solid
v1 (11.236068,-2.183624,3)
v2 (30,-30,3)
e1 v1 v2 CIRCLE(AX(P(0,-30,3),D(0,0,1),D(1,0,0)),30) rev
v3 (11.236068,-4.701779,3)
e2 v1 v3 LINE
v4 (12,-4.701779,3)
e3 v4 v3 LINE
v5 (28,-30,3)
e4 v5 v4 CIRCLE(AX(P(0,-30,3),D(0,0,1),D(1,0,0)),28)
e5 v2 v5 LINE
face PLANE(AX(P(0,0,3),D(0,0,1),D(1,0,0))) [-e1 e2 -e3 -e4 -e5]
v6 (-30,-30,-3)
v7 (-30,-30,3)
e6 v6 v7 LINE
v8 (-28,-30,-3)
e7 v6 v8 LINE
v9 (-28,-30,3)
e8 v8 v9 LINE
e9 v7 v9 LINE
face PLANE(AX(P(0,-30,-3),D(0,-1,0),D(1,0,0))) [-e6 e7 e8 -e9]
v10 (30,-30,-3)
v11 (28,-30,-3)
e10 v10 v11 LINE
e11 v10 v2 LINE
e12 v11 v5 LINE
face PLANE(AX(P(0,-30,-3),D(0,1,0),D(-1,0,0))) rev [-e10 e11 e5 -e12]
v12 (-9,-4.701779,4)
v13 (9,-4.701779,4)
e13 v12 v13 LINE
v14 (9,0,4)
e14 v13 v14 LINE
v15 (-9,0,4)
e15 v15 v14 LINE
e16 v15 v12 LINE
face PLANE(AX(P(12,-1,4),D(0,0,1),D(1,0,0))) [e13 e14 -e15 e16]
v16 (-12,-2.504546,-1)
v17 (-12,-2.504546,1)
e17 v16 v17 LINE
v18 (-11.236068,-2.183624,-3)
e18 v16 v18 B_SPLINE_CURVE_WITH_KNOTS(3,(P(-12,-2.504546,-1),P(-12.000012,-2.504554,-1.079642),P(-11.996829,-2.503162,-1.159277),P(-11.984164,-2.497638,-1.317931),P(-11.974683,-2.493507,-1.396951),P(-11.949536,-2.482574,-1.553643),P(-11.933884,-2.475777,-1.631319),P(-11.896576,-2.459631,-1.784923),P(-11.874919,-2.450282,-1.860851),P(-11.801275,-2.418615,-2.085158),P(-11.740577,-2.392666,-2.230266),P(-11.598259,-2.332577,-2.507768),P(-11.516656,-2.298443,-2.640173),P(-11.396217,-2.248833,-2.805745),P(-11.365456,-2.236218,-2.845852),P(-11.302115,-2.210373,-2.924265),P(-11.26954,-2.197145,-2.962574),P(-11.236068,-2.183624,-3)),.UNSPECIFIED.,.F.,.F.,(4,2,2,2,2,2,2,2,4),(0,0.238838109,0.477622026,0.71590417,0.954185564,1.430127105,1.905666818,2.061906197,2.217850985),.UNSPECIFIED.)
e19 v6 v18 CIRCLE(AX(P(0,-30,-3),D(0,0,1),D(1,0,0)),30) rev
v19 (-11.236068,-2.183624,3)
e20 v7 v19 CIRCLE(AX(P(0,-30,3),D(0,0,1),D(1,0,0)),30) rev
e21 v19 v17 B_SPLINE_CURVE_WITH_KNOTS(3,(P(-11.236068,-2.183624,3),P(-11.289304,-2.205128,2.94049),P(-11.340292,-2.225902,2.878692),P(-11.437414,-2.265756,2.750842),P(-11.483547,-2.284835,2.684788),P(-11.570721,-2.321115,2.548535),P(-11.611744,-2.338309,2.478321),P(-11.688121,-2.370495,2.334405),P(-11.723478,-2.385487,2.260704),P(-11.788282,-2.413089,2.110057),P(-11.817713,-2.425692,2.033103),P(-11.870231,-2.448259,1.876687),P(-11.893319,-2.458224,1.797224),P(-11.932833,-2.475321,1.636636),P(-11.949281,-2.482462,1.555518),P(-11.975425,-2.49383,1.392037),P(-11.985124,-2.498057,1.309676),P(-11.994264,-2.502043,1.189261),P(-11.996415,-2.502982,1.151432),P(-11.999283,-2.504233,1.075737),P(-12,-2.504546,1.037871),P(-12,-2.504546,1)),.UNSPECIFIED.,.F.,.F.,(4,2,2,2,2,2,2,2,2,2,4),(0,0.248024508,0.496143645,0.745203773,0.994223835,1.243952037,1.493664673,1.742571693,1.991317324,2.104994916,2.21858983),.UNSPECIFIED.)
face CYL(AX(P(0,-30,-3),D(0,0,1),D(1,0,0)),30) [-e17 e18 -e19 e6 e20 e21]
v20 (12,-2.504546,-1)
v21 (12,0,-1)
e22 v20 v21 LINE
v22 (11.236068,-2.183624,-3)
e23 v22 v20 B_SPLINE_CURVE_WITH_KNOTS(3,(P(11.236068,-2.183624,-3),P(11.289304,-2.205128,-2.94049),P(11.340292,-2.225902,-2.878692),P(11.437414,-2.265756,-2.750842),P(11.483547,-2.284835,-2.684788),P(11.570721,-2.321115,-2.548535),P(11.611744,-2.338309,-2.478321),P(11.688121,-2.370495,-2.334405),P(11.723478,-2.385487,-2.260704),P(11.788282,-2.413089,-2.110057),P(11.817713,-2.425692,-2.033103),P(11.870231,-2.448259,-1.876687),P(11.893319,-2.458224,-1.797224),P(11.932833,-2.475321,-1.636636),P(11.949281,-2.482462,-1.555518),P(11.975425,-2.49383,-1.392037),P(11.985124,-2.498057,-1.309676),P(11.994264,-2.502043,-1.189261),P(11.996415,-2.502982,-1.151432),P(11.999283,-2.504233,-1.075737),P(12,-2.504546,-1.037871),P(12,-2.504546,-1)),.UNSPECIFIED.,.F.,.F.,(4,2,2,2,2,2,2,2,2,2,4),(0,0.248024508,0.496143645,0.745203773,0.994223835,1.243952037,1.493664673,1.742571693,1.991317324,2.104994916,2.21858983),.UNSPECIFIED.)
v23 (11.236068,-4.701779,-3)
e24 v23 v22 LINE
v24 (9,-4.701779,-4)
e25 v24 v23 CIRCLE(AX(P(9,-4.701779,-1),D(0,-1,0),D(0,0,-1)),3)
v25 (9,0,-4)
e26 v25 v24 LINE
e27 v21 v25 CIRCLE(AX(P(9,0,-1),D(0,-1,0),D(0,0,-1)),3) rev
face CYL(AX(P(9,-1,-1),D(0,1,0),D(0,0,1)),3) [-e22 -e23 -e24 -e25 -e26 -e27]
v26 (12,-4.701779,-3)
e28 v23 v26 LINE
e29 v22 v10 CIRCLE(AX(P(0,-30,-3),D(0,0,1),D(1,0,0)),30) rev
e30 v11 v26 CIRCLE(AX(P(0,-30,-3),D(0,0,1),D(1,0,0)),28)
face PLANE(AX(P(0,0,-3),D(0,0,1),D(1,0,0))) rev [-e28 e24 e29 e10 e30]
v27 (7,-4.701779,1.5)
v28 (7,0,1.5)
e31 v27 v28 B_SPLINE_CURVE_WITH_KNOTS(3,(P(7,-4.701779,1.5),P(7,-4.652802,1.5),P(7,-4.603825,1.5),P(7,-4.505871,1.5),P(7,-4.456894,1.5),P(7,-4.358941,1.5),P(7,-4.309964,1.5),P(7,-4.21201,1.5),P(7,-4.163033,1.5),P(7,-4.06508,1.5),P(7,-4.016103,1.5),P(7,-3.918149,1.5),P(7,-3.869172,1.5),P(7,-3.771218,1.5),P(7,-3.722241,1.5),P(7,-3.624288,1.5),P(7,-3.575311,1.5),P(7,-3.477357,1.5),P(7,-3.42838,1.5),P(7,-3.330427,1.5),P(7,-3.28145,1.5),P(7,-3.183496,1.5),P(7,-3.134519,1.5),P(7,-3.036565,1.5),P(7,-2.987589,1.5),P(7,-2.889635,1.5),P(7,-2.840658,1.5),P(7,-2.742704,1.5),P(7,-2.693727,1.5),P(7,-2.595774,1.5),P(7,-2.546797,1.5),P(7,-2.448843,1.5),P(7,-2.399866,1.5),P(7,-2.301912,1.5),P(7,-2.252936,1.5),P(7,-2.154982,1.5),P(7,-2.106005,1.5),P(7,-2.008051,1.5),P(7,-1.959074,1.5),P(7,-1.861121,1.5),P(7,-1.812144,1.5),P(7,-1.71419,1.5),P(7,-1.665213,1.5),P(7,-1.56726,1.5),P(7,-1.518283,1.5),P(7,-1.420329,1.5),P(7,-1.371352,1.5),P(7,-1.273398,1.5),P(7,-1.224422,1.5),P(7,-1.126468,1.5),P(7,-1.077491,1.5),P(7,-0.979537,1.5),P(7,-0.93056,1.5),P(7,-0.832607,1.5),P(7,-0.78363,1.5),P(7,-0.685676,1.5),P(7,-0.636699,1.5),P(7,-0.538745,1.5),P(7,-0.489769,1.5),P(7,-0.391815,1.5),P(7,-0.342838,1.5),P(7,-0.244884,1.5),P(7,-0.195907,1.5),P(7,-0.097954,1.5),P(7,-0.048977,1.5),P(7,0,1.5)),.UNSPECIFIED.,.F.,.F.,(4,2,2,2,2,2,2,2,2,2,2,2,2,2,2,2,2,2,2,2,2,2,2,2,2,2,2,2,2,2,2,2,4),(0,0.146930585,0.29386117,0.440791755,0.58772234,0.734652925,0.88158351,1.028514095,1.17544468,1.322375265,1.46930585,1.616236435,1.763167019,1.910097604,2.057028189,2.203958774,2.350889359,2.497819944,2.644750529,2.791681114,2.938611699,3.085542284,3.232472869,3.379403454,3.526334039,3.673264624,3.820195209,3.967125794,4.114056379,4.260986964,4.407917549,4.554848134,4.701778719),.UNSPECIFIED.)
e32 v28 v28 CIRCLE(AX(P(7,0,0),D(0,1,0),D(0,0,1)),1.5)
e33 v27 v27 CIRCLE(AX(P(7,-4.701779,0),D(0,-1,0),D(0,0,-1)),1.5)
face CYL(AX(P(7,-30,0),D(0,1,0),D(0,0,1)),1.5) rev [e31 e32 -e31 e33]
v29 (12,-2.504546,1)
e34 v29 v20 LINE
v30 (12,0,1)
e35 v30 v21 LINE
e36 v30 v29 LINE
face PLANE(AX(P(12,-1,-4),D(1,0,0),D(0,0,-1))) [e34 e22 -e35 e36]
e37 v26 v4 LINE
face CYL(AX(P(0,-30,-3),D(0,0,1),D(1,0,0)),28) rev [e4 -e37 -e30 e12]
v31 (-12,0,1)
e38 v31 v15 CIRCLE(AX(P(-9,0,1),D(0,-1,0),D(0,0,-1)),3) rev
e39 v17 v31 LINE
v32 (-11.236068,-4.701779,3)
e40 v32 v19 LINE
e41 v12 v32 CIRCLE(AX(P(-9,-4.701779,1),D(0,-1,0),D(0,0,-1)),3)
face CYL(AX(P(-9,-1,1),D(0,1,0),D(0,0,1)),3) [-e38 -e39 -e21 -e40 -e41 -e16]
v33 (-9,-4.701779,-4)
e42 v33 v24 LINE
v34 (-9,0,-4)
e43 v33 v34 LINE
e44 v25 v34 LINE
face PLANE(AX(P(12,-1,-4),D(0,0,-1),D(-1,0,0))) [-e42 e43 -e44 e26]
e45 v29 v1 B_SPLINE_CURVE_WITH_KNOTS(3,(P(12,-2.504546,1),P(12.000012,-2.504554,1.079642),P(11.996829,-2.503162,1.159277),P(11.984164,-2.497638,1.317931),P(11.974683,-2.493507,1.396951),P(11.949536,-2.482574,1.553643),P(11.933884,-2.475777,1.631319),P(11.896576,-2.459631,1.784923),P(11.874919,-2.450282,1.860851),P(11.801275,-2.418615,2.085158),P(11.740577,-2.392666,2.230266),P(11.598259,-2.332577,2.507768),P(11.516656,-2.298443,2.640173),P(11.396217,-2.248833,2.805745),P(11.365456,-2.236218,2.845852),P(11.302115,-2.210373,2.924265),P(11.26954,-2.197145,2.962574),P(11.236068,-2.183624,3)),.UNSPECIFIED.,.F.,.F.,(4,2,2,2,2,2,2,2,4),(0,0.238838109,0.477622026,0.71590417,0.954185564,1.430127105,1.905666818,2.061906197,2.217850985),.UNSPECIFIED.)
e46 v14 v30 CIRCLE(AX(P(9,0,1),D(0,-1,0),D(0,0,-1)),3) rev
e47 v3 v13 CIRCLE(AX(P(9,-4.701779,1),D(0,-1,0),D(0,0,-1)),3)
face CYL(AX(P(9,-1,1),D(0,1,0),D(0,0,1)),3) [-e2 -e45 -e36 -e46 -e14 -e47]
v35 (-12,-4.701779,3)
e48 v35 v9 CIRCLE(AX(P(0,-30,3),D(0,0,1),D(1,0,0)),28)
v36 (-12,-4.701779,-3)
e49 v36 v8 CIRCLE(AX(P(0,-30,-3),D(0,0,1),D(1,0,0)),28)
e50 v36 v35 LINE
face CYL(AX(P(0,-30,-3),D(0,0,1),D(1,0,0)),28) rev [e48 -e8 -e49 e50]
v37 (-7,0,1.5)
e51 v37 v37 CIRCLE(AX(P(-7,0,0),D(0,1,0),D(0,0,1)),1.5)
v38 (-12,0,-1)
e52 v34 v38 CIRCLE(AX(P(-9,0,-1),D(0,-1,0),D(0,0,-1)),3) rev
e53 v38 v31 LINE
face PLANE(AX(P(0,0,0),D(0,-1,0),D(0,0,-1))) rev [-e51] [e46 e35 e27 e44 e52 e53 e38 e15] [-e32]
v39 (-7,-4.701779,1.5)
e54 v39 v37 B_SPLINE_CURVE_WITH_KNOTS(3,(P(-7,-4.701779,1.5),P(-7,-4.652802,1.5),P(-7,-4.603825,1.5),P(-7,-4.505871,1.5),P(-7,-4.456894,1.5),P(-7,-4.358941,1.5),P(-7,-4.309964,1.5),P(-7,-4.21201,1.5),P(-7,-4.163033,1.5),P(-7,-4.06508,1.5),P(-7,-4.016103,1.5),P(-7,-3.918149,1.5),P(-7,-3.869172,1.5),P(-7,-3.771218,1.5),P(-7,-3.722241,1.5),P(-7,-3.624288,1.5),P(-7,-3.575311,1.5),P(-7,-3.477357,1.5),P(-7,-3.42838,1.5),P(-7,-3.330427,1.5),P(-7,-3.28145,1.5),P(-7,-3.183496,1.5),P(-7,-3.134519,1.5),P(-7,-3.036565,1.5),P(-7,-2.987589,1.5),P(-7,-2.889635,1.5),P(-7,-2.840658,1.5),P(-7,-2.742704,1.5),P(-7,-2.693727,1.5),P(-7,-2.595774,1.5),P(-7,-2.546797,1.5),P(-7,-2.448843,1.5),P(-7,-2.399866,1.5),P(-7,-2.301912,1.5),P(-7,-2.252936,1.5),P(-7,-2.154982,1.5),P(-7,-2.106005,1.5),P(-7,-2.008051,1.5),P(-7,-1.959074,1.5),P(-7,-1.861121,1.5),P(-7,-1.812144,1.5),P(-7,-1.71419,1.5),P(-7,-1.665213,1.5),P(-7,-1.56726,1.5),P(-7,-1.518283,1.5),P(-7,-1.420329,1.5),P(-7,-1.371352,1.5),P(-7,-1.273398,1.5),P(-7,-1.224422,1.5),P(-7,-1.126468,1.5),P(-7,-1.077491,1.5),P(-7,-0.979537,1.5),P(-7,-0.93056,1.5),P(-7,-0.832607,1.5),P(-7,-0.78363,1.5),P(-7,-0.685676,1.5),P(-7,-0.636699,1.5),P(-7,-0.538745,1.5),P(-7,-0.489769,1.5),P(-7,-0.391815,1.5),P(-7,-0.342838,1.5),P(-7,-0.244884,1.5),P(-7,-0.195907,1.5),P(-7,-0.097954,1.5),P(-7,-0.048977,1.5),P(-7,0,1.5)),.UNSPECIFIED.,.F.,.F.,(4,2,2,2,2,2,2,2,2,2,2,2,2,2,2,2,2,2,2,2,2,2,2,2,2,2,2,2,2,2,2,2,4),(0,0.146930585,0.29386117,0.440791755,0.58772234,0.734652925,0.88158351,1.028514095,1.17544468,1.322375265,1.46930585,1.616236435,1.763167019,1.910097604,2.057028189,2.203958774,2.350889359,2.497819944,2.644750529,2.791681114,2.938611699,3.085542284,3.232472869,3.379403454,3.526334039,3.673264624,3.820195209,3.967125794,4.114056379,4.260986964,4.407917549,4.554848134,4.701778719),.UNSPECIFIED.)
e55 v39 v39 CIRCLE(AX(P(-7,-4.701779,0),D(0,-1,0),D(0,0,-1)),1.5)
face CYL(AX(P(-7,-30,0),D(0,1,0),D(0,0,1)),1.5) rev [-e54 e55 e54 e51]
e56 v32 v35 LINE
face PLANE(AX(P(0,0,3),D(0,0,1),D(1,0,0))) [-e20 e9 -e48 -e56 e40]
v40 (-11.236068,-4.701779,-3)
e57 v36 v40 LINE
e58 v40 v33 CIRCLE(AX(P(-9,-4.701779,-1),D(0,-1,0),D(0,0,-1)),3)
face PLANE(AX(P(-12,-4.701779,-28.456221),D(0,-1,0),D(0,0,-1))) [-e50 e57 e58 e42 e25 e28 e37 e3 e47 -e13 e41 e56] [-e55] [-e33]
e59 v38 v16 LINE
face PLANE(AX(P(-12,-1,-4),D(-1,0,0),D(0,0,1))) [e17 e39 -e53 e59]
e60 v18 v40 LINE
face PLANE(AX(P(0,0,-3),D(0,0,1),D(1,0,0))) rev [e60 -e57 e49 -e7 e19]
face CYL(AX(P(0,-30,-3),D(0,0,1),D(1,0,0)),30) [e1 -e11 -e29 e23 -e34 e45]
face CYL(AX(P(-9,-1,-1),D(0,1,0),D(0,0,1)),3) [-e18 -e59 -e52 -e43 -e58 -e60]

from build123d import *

# Parameters (mm, degrees)
SKETCH_2_W           = 24
SKETCH_2_H           = 8
EXTRUDE_1_DEPTH      = 1
EXTRUDE_3_DEPTH      = 3
EXTRUDE_3_DEPTH_BACK = 3
EXTRUDE_5_REACH      = 45.174
SKETCH_7_W           = 24
SKETCH_7_H           = 4.701778719
SKETCH_3_R           = 1.5
CUT_EXTRUDE_1_DEPTH  = 43.614551505
FILLET_1_R           = 3


with BuildPart() as part:
    # 草图2 → 凸台-拉伸1 (new body)
    with BuildSketch(Plane(origin=(0, 0, 0), x_dir=(1, 0, 0), z_dir=(0, 1, 0))):
        Rectangle(SKETCH_2_W, SKETCH_2_H)
    extrude(amount=-EXTRUDE_1_DEPTH)

    # 凸台-拉伸5: up to this face of the body (flat: up to its plane)
    extrude_5_end = Plane(part.part.faces().sort_by_distance((0, -0.5, -4))[0])
    # 草图7 → 凸台-拉伸5 (add, up to the picked face)
    with BuildSketch(Plane.XY.offset(4), mode=Mode.PRIVATE) as extrude_5_sk1:
        with Locations((0, -2.350889359)):
            Rectangle(SKETCH_7_W, SKETCH_7_H)
    extrude_5_tool1 = split(extrude(extrude_5_sk1.sketch, amount=-EXTRUDE_5_REACH, mode=Mode.PRIVATE), bisect_by=extrude_5_end, keep=Keep.BOTH, mode=Mode.PRIVATE)


with BuildPart() as body_2:
    # 草图5 → 凸台-拉伸3 (new, two sides: drawn at the far end of the back side and taken through both)
    with BuildSketch(Plane.XY.offset(-EXTRUDE_3_DEPTH_BACK)):
        with BuildLine():
            ThreePointArc((30, -30), (21.213203436, -8.786796564), (0, 0))
            Line((0, 0), (0, -2))
            ThreePointArc((0, -2), (19.798989873, -10.201010127), (28, -30))
            Line((28, -30), (30, -30))
        make_face()
        with BuildLine():
            Line((0, -2), (0, 0))
            ThreePointArc((0, 0), (-21.213203436, -8.786796564), (-30, -30))
            Line((-30, -30), (-28, -30))
            ThreePointArc((-28, -30), (-19.798989873, -10.201010127), (0, -2))
        make_face()
    extrude(amount=EXTRUDE_3_DEPTH + EXTRUDE_3_DEPTH_BACK)


with BuildPart() as part_1:
    add(part.part)

    add(body_2.part)  # 凸台-拉伸5 merges body 2
    add(extrude_5_tool1.solids().sort_by(Axis((0, -2.350889, 4), (0, 0, -1)))[0])

    # 草图3 → 切除-拉伸1 (cut, through all)
    with BuildSketch(Plane(origin=(0, 0, 0), x_dir=(1, 0, 0), z_dir=(0, 1, 0))):
        with Locations(Location((-7, 0, 0), (0, 0, 270))):
            Circle(SKETCH_3_R)
        with Locations(Location((7, 0, 0), (0, 0, 270))):
            Circle(SKETCH_3_R)
    extrude(amount=-CUT_EXTRUDE_1_DEPTH, mode=Mode.SUBTRACT)

    # 圆角1
    # the kernel refuses this fillet: 3 mm, written as the material it takes off along each edge
    with BuildSketch(Plane(origin=(-12, -12.201778719, 4), x_dir=(0, 0, -1), z_dir=(0, 1, 0))) as fillet_1_piece_1_section:
        with BuildLine():
            CenterArc((FILLET_1_R, -FILLET_1_R), FILLET_1_R, 90, 90)
            Line((0, -FILLET_1_R), (0, 0))
            Line((0, 0), (FILLET_1_R, 0))
        make_face()
    fillet_1_piece_1 = extrude(amount=19.701778719, mode=Mode.PRIVATE)
    fillet_1_piece_1 = split(fillet_1_piece_1, bisect_by=Plane(origin=(-10.804220272, -4.438855897, 3), z_dir=(0, 0, 1)), keep=Keep.TOP, mode=Mode.PRIVATE)
    add(fillet_1_piece_1, mode=Mode.SUBTRACT)
    with BuildSketch(Plane(origin=(-12, -12.201778719, 4), x_dir=(0, 0, -1), z_dir=(0, 1, 0))) as fillet_1_piece_2_section:
        with BuildLine():
            CenterArc((FILLET_1_R, -FILLET_1_R), FILLET_1_R, 90, 90)
            Line((0, -FILLET_1_R), (0, 0))
            Line((0, 0), (FILLET_1_R, 0))
        make_face()
    fillet_1_piece_2 = extrude(amount=19.701778719, mode=Mode.PRIVATE)
    fillet_1_piece_2 = fillet_1_piece_2 - Plane(origin=(0, -30, 2.5069518), x_dir=(1, 0, 0), z_dir=(0, 0, -1)) * Cylinder(30, 52, mode=Mode.PRIVATE)
    add(fillet_1_piece_2, mode=Mode.SUBTRACT)
    with BuildSketch(Plane(origin=(-12, -12.201778719, -4), x_dir=(1, 0, 0), z_dir=(0, 1, 0))) as fillet_1_piece_3_section:
        with BuildLine():
            CenterArc((FILLET_1_R, -FILLET_1_R), FILLET_1_R, 90, 90)
            Line((0, -FILLET_1_R), (0, 0))
            Line((0, 0), (FILLET_1_R, 0))
        make_face()
    fillet_1_piece_3 = extrude(amount=19.701778719, mode=Mode.PRIVATE)
    fillet_1_piece_3 = split(fillet_1_piece_3, bisect_by=Plane(origin=(-10.804220065, -4.438855826, -3), z_dir=(0, 0, -1)), keep=Keep.TOP, mode=Mode.PRIVATE)
    add(fillet_1_piece_3, mode=Mode.SUBTRACT)
    with BuildSketch(Plane(origin=(-12, -12.201778719, -4), x_dir=(1, 0, 0), z_dir=(0, 1, 0))) as fillet_1_piece_4_section:
        with BuildLine():
            CenterArc((FILLET_1_R, -FILLET_1_R), FILLET_1_R, 90, 90)
            Line((0, -FILLET_1_R), (0, 0))
            Line((0, 0), (FILLET_1_R, 0))
        make_face()
    fillet_1_piece_4 = extrude(amount=19.701778719, mode=Mode.PRIVATE)
    fillet_1_piece_4 = fillet_1_piece_4 - Plane(origin=(0, -30, -2.506951801), x_dir=(1, 0, 0), z_dir=(0, 0, -1)) * Cylinder(30, 52, mode=Mode.PRIVATE)
    add(fillet_1_piece_4, mode=Mode.SUBTRACT)
    with BuildSketch(Plane(origin=(12, 7.5, 4), x_dir=(0, 0, -1), z_dir=(0, -1, 0))) as fillet_1_piece_5_section:
        with BuildLine():
            CenterArc((FILLET_1_R, -FILLET_1_R), FILLET_1_R, 90, 90)
            Line((0, -FILLET_1_R), (0, 0))
            Line((0, 0), (FILLET_1_R, 0))
        make_face()
    fillet_1_piece_5 = extrude(amount=19.701778719, mode=Mode.PRIVATE)
    fillet_1_piece_5 = fillet_1_piece_5 - Plane(origin=(0, -30, 2.506951802), x_dir=(1, 0, 0), z_dir=(0, 0, -1)) * Cylinder(30, 52, mode=Mode.PRIVATE)
    add(fillet_1_piece_5, mode=Mode.SUBTRACT)
    with BuildSketch(Plane(origin=(12, 7.5, 4), x_dir=(0, 0, -1), z_dir=(0, -1, 0))) as fillet_1_piece_6_section:
        with BuildLine():
            CenterArc((FILLET_1_R, -FILLET_1_R), FILLET_1_R, 90, 90)
            Line((0, -FILLET_1_R), (0, 0))
            Line((0, 0), (FILLET_1_R, 0))
        make_face()
    fillet_1_piece_6 = extrude(amount=19.701778719, mode=Mode.PRIVATE)
    fillet_1_piece_6 = split(fillet_1_piece_6, bisect_by=Plane(origin=(11.186935792, -3.254885209, 3), z_dir=(0, 0, 1)), keep=Keep.TOP, mode=Mode.PRIVATE)
    add(fillet_1_piece_6, mode=Mode.SUBTRACT)
    with BuildSketch(Plane(origin=(12, 7.5, -4), x_dir=(-1, 0, 0), z_dir=(0, -1, 0))) as fillet_1_piece_7_section:
        with BuildLine():
            CenterArc((FILLET_1_R, -FILLET_1_R), FILLET_1_R, 90, 90)
            Line((0, -FILLET_1_R), (0, 0))
            Line((0, 0), (FILLET_1_R, 0))
        make_face()
    fillet_1_piece_7 = extrude(amount=19.701778719, mode=Mode.PRIVATE)
    fillet_1_piece_7 = split(fillet_1_piece_7, bisect_by=Plane(origin=(11.240609722, -1.095811506, -3), z_dir=(0, 0, -1)), keep=Keep.TOP, mode=Mode.PRIVATE)
    add(fillet_1_piece_7, mode=Mode.SUBTRACT)
    with BuildSketch(Plane(origin=(12, 7.5, -4), x_dir=(-1, 0, 0), z_dir=(0, -1, 0))) as fillet_1_piece_8_section:
        with BuildLine():
            CenterArc((FILLET_1_R, -FILLET_1_R), FILLET_1_R, 90, 90)
            Line((0, -FILLET_1_R), (0, 0))
            Line((0, 0), (FILLET_1_R, 0))
        make_face()
    fillet_1_piece_8 = extrude(amount=19.701778719, mode=Mode.PRIVATE)
    fillet_1_piece_8 = fillet_1_piece_8 - Plane(origin=(0, -30, -2.506951802), x_dir=(1, 0, 0), z_dir=(0, 0, -1)) * Cylinder(30, 52, mode=Mode.PRIVATE)
    add(fillet_1_piece_8, mode=Mode.SUBTRACT)


solid = part_1.part
